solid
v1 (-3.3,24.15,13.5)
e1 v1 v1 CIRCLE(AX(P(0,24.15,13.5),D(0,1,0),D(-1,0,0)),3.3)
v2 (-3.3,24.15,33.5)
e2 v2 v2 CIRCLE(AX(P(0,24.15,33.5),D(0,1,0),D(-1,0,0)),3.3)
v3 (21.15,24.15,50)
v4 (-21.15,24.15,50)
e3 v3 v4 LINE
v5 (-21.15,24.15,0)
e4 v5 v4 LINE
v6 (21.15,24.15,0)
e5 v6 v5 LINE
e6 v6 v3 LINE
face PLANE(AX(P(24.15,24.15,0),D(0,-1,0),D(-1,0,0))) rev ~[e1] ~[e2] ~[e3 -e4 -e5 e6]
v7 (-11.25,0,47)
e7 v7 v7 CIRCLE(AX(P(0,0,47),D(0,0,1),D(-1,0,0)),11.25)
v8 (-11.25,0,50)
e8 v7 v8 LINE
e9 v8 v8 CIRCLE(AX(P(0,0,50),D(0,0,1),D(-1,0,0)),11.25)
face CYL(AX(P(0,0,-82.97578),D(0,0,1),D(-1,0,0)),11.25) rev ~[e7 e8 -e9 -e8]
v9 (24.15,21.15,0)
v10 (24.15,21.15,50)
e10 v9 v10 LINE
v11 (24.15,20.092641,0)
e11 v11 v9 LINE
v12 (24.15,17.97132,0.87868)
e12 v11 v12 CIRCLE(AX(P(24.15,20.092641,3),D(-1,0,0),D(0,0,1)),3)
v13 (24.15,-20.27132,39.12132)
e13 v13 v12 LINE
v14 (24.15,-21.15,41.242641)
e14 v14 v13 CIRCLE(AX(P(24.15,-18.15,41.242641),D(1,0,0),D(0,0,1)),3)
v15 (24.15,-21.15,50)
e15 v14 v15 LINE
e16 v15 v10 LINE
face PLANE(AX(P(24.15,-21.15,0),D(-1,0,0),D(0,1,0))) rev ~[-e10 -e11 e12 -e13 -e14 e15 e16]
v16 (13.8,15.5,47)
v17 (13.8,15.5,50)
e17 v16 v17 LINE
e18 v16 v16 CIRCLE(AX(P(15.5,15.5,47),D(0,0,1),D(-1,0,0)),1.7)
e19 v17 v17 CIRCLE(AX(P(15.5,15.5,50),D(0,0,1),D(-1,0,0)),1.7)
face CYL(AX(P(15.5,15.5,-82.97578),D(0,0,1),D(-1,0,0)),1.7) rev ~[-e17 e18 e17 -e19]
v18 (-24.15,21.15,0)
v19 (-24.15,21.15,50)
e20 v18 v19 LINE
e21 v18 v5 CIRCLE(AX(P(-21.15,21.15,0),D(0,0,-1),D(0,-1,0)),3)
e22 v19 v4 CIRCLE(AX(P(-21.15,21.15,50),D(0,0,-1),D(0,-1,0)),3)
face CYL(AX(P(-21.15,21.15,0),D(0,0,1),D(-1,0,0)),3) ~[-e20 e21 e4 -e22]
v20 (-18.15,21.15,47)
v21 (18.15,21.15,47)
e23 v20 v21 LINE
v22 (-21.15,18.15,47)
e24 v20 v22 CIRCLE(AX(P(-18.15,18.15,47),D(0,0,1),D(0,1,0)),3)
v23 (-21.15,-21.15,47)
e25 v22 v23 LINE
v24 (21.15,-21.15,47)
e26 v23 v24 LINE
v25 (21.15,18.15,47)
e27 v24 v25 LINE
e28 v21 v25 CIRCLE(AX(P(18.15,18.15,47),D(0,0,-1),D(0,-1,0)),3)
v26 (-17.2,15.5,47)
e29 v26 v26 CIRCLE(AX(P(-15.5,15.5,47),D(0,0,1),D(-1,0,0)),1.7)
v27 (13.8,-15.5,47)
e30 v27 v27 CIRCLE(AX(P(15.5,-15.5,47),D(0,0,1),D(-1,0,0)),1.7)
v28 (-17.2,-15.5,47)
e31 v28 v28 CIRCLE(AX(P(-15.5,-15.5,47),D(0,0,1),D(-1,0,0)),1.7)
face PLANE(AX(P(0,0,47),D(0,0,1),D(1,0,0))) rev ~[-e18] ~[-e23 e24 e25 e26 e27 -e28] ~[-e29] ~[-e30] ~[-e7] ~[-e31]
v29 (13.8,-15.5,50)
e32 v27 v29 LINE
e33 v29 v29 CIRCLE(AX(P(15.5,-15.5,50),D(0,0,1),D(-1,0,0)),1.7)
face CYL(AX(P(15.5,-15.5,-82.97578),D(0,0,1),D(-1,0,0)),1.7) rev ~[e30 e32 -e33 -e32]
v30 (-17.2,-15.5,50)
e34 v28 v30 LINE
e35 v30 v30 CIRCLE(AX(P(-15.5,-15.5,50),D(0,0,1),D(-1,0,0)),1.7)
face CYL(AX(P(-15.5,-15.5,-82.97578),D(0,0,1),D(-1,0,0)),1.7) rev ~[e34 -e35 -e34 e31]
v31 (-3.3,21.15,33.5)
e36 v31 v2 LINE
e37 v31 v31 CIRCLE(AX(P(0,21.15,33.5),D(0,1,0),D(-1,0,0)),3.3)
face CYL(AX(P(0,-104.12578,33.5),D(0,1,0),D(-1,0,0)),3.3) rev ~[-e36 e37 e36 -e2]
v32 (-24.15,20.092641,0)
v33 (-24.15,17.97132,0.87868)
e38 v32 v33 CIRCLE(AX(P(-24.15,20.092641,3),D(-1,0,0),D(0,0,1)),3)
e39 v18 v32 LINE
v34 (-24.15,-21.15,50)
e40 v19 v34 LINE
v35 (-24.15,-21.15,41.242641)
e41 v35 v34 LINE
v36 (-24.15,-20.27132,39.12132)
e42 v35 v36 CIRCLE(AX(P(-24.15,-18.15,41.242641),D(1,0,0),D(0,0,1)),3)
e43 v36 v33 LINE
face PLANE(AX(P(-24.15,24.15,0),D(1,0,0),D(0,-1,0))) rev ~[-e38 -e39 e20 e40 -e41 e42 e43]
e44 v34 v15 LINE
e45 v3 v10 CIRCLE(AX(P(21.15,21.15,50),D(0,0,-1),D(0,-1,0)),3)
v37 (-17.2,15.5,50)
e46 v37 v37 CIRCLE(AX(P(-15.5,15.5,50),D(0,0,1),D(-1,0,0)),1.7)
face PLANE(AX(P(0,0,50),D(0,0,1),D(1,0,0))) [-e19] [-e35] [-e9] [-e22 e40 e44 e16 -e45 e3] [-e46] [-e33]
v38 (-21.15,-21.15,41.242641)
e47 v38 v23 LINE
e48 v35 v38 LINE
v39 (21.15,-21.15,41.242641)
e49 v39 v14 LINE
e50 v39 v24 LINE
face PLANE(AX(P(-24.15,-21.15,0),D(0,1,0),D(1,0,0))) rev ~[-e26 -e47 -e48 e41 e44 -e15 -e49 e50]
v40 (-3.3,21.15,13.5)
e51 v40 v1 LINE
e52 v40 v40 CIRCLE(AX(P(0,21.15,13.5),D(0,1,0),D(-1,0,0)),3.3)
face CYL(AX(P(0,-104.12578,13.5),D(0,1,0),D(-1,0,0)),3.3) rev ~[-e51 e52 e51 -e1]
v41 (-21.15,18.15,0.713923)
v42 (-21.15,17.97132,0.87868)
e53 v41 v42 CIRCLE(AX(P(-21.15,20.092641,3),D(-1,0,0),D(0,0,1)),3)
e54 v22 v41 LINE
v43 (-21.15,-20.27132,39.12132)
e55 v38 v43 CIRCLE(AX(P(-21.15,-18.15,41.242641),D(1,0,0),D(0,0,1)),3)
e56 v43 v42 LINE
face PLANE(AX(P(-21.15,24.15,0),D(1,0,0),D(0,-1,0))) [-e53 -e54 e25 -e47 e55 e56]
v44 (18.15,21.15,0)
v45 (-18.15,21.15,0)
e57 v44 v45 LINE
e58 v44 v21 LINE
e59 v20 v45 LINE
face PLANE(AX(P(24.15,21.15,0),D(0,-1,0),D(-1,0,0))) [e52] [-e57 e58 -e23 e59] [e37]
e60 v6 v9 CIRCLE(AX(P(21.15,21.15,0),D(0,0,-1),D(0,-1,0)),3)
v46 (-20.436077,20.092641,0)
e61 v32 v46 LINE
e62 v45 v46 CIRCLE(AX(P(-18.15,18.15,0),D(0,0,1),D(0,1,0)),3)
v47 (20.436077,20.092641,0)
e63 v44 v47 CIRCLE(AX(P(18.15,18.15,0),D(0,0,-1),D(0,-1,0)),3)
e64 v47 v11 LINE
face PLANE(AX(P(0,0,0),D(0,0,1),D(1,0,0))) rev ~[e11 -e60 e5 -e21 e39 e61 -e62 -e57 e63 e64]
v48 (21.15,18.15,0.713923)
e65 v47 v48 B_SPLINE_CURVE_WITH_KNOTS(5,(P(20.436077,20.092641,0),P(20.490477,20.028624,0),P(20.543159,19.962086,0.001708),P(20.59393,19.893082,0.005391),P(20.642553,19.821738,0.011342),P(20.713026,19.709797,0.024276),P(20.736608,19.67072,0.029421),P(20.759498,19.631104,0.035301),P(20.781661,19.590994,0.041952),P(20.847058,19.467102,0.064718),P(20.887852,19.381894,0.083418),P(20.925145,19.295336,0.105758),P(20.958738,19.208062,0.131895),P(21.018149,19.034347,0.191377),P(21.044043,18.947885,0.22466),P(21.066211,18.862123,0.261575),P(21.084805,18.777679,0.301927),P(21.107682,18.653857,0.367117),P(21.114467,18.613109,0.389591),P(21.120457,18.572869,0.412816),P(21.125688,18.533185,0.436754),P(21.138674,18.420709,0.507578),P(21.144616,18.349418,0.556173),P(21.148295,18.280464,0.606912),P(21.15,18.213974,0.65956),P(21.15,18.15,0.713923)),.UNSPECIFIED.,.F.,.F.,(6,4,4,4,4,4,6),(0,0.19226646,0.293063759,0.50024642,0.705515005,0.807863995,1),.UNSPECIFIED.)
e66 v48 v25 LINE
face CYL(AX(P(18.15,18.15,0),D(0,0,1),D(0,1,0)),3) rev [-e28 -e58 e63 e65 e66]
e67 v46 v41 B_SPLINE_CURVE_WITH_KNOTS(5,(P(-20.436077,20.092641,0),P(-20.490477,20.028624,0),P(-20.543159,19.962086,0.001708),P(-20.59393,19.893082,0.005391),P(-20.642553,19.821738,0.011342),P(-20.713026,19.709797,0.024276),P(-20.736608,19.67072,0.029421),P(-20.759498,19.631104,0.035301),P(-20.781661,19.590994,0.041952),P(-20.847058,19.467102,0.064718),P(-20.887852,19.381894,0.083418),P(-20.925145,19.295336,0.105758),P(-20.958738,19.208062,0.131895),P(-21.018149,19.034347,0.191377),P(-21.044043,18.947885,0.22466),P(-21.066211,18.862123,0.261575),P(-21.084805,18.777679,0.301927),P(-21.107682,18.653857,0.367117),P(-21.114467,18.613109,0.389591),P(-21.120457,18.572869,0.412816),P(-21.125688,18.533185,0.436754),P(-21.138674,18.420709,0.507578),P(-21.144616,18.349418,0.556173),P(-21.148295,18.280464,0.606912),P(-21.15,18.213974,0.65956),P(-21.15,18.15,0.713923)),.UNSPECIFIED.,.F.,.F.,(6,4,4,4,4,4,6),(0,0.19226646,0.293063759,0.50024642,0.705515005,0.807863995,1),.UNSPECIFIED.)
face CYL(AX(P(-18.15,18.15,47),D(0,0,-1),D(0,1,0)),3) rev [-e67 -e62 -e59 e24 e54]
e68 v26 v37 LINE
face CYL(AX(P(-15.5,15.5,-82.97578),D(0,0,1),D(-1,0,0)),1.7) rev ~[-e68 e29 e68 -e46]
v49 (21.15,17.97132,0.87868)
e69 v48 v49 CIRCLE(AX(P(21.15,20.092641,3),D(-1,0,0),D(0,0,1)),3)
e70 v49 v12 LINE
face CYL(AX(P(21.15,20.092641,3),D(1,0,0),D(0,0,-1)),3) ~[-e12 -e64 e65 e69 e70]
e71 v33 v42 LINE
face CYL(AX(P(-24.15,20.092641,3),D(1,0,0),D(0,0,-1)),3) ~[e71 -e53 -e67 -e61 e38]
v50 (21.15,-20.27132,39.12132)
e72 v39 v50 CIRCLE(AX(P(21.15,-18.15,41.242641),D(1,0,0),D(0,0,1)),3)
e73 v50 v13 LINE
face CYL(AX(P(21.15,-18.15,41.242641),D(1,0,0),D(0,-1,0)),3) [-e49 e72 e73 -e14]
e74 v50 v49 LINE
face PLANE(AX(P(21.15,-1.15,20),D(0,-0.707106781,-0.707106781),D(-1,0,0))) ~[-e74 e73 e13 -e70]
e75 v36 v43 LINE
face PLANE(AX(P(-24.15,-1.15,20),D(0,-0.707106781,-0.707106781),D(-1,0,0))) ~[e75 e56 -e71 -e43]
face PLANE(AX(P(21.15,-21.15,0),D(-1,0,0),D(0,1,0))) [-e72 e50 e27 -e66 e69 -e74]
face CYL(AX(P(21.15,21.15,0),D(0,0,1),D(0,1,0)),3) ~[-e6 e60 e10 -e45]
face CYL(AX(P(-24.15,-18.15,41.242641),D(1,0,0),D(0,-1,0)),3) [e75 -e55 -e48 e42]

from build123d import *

# Parameters (mm, degrees)
F1_W     = 42.3
F1_H     = 42.3
F1_R     = 1.625
F2_DEPTH = 50
F4_T     = -3
F5_D     = 3.4
F6_D     = 6.6
F7_D     = 22.5
F8_SIZE  = 40
F9_R     = 3


with BuildPart() as f2:
    # F1 (on Top) → F2 (new body)
    with BuildSketch(Plane.XY):
        Rectangle(F1_W, F1_H)
        with Locations((-15.5, -15.5)):
            Circle(F1_R, mode=Mode.SUBTRACT)
        with Locations((15.5, -15.5)):
            Circle(F1_R, mode=Mode.SUBTRACT)
        with Locations((-15.5, 15.5)):
            Circle(F1_R, mode=Mode.SUBTRACT)
        with Locations((15.5, 15.5)):
            Circle(F1_R, mode=Mode.SUBTRACT)
        with Locations((-15.5, 15.5)):
            Circle(F1_R)
        with Locations((15.5, 15.5)):
            Circle(F1_R)
        with Locations((-15.5, -15.5)):
            Circle(F1_R)
        with Locations((15.5, -15.5)):
            Circle(F1_R)
        Polygon((-21.15, 21.15), (21.15, 21.15), (21.15, -21.15), (24.15, -21.15), (24.15, 24.15), (-24.15, 24.15), (-24.15, -21.15), (-21.15, -21.15), align=None)
    extrude(amount=F2_DEPTH)

    # F4
    f4_openings = [f2.faces().sort_by_distance(p)[0] for p in [
        (0, -21.15, 25),
        (0, 1.5, 0),
    ]]
    offset(amount=F4_T, openings=f4_openings)

    # F5 (through all)
    with Locations(Plane(origin=(0, 0, 0), x_dir=(1, 0, 0), z_dir=(0, 0, -1))):
        with Locations((-15.5, 15.5), (15.5, 15.5), (15.5, -15.5), (-15.5, -15.5)):
            Hole(F5_D / 2)

    # F6 (through all)
    with Locations(Plane.XZ.offset(21.15)):
        with Locations((0, 33.5), (0, 13.5)):
            Hole(F6_D / 2)

    # F7 (through all)
    with Locations(Plane(origin=(0, 0, 0), x_dir=(1, 0, 0), z_dir=(0, 0, -1))):
        with Locations((0, 0)):
            Hole(F7_D / 2)

    # F8
    f8_edges = [f2.edges().sort_by_distance(p)[0] for p in [
        (-22.65, -21.15, 0),
        (22.65, -21.15, 0),
    ]]
    chamfer(f8_edges, length=F8_SIZE)

    # F9 (call 1 of 8: OpenCascade refuses the feature's edges together)
    f9_edges = [f2.edges().sort_by_distance(p)[0] for p in [
        (-22.65, -21.15, 40),
    ]]
    fillet(f9_edges, radius=F9_R)

    # F9#2 (call 2 of 8)
    f9_2_edges = [f2.edges().sort_by_distance(p)[0] for p in [
        (22.65, -21.15, 40),
    ]]
    fillet(f9_2_edges, radius=F9_R)

    # F9#3 (call 3 of 8)
    f9_3_edges = [f2.edges().sort_by_distance(p)[0] for p in [
        (-22.65, 18.85, 0),
    ]]
    fillet(f9_3_edges, radius=F9_R)

    # F9#4 (call 4 of 8)
    f9_4_edges = [f2.edges().sort_by_distance(p)[0] for p in [
        (22.65, 18.85, 0),
    ]]
    fillet(f9_4_edges, radius=F9_R)

    # F9#5 (call 5 of 8)
    f9_5_edges = [f2.edges().sort_by_distance(p)[0] for p in [
        (-21.15, 21.15, 23.5),
    ]]
    fillet(f9_5_edges, radius=F9_R)

    # F9#6 (call 6 of 8)
    f9_6_edges = [f2.edges().sort_by_distance(p)[0] for p in [
        (21.15, 21.15, 23.5),
    ]]
    fillet(f9_6_edges, radius=F9_R)

    # F9#7 (call 7 of 8)
    f9_7_edges = [f2.edges().sort_by_distance(p)[0] for p in [
        (-24.15, 24.15, 25),
    ]]
    fillet(f9_7_edges, radius=F9_R)

    # F9#8 (call 8 of 8)
    f9_8_edges = [f2.edges().sort_by_distance(p)[0] for p in [
        (24.15, 24.15, 25),
    ]]
    fillet(f9_8_edges, radius=F9_R)


solid = f2.part
